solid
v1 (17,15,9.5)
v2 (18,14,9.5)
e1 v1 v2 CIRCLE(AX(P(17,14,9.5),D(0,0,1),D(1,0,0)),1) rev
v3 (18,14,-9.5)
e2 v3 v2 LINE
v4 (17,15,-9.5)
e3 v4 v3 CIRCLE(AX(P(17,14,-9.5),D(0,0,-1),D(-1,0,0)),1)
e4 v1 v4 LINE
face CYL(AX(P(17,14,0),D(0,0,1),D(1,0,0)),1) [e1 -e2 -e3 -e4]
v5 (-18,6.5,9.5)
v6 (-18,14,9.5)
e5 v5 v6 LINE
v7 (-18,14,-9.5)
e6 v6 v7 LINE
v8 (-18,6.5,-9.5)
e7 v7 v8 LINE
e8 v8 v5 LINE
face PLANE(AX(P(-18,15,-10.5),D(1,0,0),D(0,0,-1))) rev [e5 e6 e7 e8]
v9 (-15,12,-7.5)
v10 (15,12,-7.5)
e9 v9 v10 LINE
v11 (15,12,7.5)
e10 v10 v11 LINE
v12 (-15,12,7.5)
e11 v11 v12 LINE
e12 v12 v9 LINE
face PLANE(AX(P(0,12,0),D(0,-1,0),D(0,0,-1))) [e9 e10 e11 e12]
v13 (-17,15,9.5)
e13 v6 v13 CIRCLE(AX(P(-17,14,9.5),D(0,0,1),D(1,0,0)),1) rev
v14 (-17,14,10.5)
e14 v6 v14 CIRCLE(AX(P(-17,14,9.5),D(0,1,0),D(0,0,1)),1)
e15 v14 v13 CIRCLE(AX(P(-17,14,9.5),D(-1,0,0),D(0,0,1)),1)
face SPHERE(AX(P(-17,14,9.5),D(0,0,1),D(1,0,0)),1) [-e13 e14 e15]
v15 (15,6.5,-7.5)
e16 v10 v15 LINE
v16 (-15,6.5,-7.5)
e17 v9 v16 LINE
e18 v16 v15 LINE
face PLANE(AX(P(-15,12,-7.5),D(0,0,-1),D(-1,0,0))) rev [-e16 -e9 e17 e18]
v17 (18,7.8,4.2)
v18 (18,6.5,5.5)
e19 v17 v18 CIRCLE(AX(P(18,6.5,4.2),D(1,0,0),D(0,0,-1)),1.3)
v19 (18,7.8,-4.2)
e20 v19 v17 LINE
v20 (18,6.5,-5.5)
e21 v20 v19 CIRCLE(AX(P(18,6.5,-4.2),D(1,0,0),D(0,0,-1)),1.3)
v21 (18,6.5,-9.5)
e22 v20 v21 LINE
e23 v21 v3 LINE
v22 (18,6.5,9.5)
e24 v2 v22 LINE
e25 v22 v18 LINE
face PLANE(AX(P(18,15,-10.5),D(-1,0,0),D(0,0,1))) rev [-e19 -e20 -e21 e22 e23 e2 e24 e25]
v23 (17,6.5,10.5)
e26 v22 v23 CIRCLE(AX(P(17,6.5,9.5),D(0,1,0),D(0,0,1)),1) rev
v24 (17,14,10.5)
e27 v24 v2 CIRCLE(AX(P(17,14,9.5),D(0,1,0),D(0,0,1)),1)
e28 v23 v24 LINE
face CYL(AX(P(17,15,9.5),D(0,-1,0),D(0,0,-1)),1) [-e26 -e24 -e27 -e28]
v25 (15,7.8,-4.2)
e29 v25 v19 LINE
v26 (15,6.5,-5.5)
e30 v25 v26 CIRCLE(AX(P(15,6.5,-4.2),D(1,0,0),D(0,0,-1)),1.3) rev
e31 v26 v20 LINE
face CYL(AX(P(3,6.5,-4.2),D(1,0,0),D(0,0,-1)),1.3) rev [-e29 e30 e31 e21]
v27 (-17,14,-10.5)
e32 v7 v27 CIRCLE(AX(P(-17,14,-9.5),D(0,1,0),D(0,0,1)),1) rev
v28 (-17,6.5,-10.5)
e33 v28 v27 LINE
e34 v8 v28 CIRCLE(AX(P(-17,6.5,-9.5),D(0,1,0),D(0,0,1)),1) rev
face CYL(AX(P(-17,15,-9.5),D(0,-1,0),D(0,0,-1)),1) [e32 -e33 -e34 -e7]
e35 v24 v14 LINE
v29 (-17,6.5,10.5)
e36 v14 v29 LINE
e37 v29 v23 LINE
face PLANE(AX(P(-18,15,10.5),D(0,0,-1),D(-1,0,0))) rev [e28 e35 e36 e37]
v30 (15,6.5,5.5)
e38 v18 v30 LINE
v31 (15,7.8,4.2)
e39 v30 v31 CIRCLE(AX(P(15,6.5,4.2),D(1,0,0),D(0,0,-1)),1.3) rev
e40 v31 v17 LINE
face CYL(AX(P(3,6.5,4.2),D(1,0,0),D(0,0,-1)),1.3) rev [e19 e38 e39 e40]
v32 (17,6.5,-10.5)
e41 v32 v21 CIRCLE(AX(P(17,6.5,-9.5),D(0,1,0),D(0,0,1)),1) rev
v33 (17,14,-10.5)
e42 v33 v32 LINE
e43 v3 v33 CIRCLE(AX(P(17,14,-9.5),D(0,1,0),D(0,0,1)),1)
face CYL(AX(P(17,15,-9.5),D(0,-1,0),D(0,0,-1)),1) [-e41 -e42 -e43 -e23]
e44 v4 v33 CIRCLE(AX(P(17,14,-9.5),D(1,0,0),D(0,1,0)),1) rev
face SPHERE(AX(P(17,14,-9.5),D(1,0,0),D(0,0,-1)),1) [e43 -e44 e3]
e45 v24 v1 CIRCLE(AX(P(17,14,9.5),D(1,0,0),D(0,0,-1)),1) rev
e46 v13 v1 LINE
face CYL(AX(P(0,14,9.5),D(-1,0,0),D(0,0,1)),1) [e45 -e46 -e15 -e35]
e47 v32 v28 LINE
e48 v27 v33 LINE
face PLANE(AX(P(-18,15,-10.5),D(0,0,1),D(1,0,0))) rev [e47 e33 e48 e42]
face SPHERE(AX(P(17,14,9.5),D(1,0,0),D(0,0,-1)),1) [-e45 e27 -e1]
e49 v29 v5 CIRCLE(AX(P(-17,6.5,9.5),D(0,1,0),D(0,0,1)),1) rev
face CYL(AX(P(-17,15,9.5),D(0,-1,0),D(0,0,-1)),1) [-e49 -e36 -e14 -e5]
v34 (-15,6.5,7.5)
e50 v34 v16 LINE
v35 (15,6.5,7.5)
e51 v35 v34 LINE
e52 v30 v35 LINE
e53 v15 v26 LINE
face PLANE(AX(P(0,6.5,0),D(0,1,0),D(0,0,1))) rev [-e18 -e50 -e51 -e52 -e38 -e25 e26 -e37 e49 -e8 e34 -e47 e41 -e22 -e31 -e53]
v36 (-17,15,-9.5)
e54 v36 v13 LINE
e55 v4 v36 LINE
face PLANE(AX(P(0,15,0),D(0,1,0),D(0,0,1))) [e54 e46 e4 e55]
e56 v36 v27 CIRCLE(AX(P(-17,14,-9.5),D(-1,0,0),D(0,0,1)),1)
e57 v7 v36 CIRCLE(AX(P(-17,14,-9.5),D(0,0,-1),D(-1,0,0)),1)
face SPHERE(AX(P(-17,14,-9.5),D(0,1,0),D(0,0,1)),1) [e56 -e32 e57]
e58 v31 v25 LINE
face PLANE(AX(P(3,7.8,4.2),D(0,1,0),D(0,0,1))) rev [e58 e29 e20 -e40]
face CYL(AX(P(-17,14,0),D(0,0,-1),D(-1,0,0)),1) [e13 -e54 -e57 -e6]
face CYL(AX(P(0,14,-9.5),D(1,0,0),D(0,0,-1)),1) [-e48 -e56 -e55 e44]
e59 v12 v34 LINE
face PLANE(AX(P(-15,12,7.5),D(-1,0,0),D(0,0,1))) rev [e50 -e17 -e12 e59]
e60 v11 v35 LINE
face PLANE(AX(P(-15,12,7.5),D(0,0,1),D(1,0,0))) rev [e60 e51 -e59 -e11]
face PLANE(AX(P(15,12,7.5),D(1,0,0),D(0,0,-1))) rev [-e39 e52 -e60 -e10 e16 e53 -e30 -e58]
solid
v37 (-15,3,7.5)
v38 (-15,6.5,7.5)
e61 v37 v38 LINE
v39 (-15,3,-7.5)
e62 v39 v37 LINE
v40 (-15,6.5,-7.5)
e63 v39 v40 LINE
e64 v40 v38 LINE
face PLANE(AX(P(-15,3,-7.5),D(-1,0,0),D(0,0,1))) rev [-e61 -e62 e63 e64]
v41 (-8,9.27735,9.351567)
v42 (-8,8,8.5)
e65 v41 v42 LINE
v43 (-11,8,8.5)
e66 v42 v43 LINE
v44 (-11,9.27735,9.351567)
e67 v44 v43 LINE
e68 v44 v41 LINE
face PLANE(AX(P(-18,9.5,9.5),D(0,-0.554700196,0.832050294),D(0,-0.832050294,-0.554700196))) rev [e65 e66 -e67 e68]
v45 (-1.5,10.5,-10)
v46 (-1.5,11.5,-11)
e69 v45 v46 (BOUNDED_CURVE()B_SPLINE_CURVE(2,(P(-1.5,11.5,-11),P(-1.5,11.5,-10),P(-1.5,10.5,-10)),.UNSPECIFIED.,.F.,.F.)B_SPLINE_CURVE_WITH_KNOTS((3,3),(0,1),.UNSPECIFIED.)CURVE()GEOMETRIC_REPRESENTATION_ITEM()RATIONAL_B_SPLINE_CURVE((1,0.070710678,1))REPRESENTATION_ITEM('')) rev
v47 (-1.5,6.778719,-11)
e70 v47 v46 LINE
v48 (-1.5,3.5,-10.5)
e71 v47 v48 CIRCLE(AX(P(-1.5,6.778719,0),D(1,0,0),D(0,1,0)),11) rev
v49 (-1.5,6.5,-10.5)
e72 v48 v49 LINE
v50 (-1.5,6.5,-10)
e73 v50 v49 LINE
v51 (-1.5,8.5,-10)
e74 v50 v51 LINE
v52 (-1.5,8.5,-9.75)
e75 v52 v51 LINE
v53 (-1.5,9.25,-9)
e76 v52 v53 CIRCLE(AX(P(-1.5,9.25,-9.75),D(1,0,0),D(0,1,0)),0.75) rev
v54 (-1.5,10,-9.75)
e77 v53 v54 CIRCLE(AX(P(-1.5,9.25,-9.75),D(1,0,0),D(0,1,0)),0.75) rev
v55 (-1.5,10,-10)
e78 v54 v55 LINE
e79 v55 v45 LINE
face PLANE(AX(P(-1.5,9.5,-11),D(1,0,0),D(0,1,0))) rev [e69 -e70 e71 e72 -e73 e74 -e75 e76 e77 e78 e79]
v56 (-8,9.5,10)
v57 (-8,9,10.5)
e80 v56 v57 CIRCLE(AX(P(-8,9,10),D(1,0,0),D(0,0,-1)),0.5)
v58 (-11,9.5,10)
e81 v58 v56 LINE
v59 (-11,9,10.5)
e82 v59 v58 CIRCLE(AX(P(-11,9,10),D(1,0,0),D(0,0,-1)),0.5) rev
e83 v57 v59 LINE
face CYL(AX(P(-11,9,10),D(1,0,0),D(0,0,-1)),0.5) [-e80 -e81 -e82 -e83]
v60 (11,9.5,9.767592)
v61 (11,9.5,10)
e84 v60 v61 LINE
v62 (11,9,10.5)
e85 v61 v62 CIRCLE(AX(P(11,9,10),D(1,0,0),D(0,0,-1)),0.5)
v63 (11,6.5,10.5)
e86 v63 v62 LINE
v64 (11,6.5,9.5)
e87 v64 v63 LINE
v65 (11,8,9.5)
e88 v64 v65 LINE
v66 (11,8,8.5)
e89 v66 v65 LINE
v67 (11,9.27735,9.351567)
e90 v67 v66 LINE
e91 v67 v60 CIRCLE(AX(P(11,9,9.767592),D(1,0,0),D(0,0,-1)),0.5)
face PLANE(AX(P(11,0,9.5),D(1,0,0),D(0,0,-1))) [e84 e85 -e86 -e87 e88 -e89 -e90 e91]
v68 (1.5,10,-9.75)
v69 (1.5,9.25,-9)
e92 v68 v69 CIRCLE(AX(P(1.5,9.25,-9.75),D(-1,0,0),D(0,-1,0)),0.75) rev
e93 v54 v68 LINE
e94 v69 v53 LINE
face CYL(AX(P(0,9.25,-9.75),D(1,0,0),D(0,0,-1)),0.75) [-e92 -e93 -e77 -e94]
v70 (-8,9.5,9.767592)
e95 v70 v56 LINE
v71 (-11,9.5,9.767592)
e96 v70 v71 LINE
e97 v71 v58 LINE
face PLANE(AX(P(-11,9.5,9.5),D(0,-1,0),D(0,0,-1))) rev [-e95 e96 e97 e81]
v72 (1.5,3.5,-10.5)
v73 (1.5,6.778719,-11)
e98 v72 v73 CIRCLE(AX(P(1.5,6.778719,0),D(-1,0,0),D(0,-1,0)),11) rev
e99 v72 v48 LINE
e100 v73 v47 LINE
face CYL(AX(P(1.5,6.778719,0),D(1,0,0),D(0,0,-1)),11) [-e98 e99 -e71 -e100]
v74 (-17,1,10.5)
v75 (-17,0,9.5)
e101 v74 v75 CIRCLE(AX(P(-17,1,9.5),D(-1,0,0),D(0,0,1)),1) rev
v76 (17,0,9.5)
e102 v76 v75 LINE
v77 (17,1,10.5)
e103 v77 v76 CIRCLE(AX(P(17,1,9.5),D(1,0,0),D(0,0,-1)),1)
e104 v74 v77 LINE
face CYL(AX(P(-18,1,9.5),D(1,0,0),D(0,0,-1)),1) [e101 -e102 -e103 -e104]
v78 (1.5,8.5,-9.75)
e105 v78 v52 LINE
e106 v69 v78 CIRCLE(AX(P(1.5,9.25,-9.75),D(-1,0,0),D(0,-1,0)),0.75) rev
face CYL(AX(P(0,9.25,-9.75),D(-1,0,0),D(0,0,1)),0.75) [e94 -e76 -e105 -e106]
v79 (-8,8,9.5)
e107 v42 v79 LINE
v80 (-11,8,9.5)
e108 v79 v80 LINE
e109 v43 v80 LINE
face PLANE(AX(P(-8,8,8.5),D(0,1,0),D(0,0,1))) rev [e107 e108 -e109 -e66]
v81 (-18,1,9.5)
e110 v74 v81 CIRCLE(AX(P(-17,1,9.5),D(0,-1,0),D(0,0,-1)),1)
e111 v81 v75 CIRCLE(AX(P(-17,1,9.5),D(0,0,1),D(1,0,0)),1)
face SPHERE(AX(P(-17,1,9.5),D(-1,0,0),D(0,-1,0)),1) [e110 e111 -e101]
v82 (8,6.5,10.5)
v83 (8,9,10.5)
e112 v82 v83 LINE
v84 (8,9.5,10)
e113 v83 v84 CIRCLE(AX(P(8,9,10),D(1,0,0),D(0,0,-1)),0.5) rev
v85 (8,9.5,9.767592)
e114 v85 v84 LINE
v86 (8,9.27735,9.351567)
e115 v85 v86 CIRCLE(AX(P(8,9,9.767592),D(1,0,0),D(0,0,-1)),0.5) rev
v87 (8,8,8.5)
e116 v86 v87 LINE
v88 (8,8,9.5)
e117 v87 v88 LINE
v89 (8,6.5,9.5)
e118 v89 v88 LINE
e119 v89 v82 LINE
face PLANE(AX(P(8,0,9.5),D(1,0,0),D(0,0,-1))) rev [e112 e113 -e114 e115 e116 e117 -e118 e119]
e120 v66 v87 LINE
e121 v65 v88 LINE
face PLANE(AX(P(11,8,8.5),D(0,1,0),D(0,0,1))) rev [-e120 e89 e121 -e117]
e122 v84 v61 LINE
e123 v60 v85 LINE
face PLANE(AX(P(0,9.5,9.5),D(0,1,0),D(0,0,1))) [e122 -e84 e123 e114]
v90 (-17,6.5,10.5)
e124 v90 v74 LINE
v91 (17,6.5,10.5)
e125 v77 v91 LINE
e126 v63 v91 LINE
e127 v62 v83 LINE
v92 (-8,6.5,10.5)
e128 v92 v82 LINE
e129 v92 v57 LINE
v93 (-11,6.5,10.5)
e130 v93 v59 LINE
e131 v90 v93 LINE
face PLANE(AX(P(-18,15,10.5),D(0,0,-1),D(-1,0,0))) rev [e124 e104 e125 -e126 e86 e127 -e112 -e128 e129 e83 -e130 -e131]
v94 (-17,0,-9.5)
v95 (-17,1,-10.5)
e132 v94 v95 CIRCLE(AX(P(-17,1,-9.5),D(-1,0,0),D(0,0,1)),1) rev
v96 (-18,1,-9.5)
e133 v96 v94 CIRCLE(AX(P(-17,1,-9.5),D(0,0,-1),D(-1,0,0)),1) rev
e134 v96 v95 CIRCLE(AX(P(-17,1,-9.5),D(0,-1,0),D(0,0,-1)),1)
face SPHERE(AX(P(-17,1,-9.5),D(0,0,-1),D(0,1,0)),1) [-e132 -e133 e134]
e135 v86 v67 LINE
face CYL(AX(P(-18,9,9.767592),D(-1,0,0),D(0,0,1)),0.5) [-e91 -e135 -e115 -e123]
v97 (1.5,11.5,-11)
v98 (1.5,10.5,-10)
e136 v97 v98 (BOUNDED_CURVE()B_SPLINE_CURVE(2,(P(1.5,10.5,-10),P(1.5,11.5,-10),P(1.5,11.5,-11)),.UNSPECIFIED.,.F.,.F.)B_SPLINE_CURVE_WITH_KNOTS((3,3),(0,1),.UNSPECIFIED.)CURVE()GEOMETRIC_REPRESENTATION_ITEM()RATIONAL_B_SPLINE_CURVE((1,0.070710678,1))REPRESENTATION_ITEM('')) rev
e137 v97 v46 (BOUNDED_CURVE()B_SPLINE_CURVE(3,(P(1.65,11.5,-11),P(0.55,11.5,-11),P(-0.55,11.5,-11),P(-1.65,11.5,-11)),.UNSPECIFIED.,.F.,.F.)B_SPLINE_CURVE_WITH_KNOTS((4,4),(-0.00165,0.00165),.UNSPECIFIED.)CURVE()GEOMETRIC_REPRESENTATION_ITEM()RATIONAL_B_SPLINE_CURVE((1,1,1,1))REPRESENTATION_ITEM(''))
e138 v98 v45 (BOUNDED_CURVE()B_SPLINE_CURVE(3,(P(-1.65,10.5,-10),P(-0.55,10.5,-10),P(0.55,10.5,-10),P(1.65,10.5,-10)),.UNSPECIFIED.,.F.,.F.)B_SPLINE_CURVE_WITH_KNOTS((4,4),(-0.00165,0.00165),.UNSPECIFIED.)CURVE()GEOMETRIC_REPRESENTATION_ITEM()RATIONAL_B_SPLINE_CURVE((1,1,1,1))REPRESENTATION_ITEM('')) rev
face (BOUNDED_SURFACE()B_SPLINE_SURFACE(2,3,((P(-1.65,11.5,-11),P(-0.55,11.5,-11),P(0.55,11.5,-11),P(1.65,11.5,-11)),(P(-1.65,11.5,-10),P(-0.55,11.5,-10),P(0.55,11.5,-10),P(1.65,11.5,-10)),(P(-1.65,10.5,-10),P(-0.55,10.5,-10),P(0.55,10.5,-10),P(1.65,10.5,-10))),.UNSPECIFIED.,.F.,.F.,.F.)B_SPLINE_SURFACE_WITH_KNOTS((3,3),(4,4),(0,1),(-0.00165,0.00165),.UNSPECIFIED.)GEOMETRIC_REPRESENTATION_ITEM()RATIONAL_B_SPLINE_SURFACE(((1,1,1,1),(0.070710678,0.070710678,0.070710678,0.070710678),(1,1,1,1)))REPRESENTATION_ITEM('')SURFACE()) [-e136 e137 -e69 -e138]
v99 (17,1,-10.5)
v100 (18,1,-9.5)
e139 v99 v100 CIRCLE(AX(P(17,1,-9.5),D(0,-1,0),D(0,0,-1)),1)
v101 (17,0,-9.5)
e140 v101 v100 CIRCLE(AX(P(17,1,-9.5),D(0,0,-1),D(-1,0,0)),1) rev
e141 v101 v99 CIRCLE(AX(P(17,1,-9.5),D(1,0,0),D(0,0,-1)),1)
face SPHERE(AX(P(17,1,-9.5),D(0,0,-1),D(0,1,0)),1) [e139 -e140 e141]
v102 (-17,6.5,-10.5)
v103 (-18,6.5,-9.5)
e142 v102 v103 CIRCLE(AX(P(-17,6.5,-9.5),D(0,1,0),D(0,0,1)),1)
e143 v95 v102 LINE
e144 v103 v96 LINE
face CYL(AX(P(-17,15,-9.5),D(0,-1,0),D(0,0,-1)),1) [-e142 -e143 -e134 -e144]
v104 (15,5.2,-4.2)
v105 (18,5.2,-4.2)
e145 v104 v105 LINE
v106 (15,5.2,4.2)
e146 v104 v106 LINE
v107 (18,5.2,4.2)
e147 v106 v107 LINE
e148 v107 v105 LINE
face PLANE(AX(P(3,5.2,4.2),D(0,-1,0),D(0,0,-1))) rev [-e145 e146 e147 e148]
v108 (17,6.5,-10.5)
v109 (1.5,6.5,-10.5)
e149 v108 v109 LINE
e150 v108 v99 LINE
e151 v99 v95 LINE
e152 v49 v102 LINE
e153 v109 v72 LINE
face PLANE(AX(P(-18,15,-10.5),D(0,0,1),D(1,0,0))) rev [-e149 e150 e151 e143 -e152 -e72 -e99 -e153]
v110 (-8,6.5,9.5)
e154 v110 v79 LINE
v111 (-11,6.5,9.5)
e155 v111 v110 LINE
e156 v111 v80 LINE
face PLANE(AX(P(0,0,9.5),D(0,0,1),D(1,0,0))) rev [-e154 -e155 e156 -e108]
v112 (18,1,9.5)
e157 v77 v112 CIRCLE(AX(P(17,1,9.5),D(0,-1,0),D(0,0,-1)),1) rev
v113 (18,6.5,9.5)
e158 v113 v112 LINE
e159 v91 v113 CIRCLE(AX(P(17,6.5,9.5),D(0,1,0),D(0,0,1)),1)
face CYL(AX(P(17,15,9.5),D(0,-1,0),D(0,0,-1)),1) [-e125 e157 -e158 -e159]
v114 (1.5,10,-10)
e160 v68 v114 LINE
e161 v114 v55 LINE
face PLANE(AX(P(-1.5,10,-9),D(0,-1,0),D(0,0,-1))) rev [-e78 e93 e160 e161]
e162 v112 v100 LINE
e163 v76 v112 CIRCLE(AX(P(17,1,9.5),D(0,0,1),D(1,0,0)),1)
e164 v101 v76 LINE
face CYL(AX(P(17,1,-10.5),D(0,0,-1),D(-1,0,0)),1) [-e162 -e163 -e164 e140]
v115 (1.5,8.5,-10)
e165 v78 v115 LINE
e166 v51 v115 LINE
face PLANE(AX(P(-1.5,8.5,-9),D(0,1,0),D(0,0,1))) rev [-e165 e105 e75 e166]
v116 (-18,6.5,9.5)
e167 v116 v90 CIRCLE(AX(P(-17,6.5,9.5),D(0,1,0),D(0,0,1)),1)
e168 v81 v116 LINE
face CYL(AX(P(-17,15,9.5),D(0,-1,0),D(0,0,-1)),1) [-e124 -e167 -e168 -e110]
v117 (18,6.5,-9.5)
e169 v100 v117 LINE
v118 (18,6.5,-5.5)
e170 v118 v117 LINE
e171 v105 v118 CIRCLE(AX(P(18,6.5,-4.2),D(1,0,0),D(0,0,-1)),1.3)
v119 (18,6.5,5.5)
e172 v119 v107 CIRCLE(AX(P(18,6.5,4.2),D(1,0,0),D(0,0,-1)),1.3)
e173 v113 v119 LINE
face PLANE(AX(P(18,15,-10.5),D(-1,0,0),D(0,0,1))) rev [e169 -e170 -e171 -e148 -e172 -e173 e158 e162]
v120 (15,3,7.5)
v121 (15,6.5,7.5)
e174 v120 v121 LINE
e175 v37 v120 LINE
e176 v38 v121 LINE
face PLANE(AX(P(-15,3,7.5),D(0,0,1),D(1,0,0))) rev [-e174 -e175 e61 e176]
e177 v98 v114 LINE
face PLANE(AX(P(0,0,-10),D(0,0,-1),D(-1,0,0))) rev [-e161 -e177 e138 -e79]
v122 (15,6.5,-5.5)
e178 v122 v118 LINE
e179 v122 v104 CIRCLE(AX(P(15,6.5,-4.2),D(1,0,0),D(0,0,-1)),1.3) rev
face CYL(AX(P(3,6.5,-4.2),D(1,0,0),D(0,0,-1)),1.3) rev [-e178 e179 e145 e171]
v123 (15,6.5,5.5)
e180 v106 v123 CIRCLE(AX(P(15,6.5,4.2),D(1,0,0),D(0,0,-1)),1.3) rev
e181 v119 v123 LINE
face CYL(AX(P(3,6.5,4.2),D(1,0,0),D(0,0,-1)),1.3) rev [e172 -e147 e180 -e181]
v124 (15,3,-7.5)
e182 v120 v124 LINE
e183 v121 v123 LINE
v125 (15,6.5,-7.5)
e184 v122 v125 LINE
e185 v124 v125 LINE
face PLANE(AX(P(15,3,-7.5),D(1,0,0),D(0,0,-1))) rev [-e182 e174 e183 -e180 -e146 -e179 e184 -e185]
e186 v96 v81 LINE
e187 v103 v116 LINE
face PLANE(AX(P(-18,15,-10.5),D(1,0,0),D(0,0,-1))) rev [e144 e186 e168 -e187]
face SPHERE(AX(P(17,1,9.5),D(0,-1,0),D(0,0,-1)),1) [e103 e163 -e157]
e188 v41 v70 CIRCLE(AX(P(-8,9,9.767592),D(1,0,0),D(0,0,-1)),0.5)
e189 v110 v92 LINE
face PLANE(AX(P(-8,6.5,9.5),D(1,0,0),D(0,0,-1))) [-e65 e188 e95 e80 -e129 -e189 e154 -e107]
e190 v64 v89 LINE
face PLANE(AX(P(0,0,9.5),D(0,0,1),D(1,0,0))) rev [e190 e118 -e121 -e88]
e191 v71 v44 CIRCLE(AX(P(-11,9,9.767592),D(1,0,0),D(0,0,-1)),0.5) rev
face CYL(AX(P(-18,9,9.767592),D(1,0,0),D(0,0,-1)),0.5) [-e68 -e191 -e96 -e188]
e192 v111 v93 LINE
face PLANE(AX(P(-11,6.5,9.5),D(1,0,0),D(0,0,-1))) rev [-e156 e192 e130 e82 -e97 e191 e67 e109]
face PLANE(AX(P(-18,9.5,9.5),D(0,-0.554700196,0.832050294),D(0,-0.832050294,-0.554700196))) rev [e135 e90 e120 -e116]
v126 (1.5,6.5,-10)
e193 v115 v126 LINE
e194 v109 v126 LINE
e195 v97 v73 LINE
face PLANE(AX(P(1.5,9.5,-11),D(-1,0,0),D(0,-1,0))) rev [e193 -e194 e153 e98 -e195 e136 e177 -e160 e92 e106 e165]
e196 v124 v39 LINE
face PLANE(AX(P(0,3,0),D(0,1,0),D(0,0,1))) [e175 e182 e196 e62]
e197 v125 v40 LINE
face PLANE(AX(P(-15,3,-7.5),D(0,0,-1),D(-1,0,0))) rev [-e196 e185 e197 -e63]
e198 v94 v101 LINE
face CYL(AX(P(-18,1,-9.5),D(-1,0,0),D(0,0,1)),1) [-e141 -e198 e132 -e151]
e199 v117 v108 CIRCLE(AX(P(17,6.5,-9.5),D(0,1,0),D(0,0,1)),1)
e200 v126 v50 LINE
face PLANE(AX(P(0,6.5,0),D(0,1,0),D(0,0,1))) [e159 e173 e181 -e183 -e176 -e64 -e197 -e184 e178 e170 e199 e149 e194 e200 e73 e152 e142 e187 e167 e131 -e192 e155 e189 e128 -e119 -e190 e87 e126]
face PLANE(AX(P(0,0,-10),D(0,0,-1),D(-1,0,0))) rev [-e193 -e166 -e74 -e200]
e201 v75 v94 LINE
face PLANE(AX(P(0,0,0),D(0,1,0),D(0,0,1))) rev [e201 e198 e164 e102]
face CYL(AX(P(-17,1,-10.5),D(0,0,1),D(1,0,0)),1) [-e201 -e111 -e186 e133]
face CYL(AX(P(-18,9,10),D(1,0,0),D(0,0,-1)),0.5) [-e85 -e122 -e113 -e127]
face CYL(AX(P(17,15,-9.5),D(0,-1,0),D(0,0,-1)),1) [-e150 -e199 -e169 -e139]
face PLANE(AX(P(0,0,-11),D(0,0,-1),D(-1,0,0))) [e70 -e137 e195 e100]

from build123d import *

# Parameters (mm, degrees)
SKETCH1_W           = 36
SKETCH1_H           = 21
BOSS_EXTRUDE2_DEPTH = 15
CUT_EXTRUDE1_DEPTH  = 15
SKETCH5_W           = 30
SKETCH5_H           = 15
CUT_EXTRUDE2_DEPTH  = 3.5
SKETCH7_W           = 30
SKETCH7_H           = 15
CUT_EXTRUDE3_DEPTH  = 5.5
FILLET1_R           = 1
FILLET2_R           = 1
SKETCH9_W           = 3
SKETCH9_H           = 3
BOSS_EXTRUDE3_DEPTH = 1
SKETCH9_4_W         = 3
SKETCH9_4_H         = 3
BOSS_EXTRUDE4_DEPTH = 1
SKETCH10_W          = 3
SKETCH10_H          = 1.5
BOSS_EXTRUDE5_DEPTH = 1
CUT_EXTRUDE4_DEPTH  = 35.296501279
SKETCH12_W          = 3
SKETCH12_H          = 6
BOSS_EXTRUDE6_DEPTH = 0.5
FILLET3_R           = 11
FILLET4_R           = 0.5
SKETCH17_W          = 3
SKETCH17_H          = 2
BOSS_EXTRUDE7_DEPTH = 1
SKETCH18_W          = 3
SKETCH18_H          = 1.5
BOSS_EXTRUDE8_DEPTH = 1
FILLET5_R           = 0.75
FILLET6_SIZE        = 1


# Some blends are built 0.0001 mm under size
with BuildPart() as part:
    # Sketch1 → Boss-Extrude2 (new body)
    with BuildSketch(Plane(origin=(0, 0, 0), x_dir=(1, 0, 0), z_dir=(0, 1, 0))):
        Rectangle(SKETCH1_W, SKETCH1_H)
    extrude(amount=BOSS_EXTRUDE2_DEPTH)

    # Sketch2 → Cut-Extrude1 (cut)
    with BuildSketch(Plane(origin=(18, 0, 0), x_dir=(0, 0, -1), z_dir=(1, 0, 0))):
        with BuildLine():
            Line((-4.2, 7.8), (4.2, 7.8))
            ThreePointArc((4.2, 7.8), (5.5, 6.5), (4.2, 5.2))
            Line((4.2, 5.2), (-4.2, 5.2))
            ThreePointArc((-4.2, 5.2), (-5.5, 6.5), (-4.2, 7.8))
        make_face()
    extrude(amount=-CUT_EXTRUDE1_DEPTH, mode=Mode.SUBTRACT)


with BuildPart() as body_2:
    # Split1: the piece on the far side of the plane
    add(part.part)
    split(bisect_by=Plane.ZX.offset(6.5), keep=Keep.BOTTOM)

    # Sketch5 → Cut-Extrude2 (cut)
    with BuildSketch(Plane(origin=(0, 6.5, 0), x_dir=(1, 0, 0), z_dir=(0, 1, 0))):
        Rectangle(SKETCH5_W, SKETCH5_H)
    extrude(amount=-CUT_EXTRUDE2_DEPTH, mode=Mode.SUBTRACT)

    # Fillet2
    fillet2_edges = [body_2.edges().sort_by_distance(p)[0] for p in [
        (18, 0, 0),
        (0, 0, -10.5),
        (-18, 0, 0),
        (0, 0, 10.5),
        (18, 3.25, 10.5),
        (-18, 3.25, 10.5),
        (-18, 3.25, -10.5),
        (18, 3.25, -10.5),
    ]]
    fillet(fillet2_edges, radius=FILLET2_R)

    # Sketch9 → Boss-Extrude3 (add)
    with BuildSketch(Plane.XY.offset(10.5)):
        with Locations((-9.5, 8)):
            Rectangle(SKETCH9_W, SKETCH9_H)
    extrude(amount=-BOSS_EXTRUDE3_DEPTH)

    # Sketch9<4> → Boss-Extrude4 (add)
    with BuildSketch(Plane.XY.offset(10.5)):
        with Locations((9.5, 8)):
            Rectangle(SKETCH9_4_W, SKETCH9_4_H)
    extrude(amount=-BOSS_EXTRUDE4_DEPTH)

    # Sketch10 → Boss-Extrude5 (add)
    with BuildSketch(Plane(origin=(0, 0, 9.5), x_dir=(-1, 0, 0), z_dir=(0, 0, -1))):
        with Locations((-9.5, 8.75)):
            Rectangle(SKETCH10_W, SKETCH10_H)
        with Locations((9.5, 8.75)):
            Rectangle(SKETCH10_W, SKETCH10_H)
    extrude(amount=BOSS_EXTRUDE5_DEPTH)

    # Sketch11 → Cut-Extrude4 (cut, through all)
    with BuildSketch(Plane(origin=(11, 0, 0), x_dir=(0, 0, -1), z_dir=(1, 0, 0))):
        Polygon((-9.5, 9.5), (-8.5, 8), (-8.5, 9.5), align=None)
    extrude(amount=-CUT_EXTRUDE4_DEPTH, mode=Mode.SUBTRACT)

    # Sketch12 → Boss-Extrude6 (add, symmetric)
    with BuildSketch(Plane(origin=(0, 0, -10.5), x_dir=(-1, 0, 0), z_dir=(0, 0, -1))):
        with Locations((0, 6.5)):
            Rectangle(SKETCH12_W, SKETCH12_H)
    extrude(amount=BOSS_EXTRUDE6_DEPTH, both=True)

    # Fillet3
    # the kernel refuses this fillet: 11 mm, written as the material it takes off along each edge
    with BuildSketch(Plane(origin=(-9.696798155, 3.5, -11), x_dir=(0, 0, 1), z_dir=(1, 0, 0))) as fillet3_piece_1:
        with BuildLine():
            CenterArc((11, -3.278719262), FILLET3_R, 162.658557197, 17.341442803)
            Line((0, -3.278719262), (-0.22, -3.278719262))
            Line((-0.22, -3.278719262), (-0.22, 0))
            Line((-0.22, 0), (0, 0.22))
            ThreePointArc((0, 0.22), (0.25, 0.22), (0.29, 0.065574385))
            Line((0.29, 0.065574385), (0.5, 0))
        make_face()
    extrude(amount=19.393596311, mode=Mode.SUBTRACT)

    # Fillet4
    fillet4_edges = [body_2.edges().sort_by_distance(p)[0] for p in [
        (-9.5, 9.5, 9.5),
        (9.5, 9.5, 9.5),
        (-9.5, 9.5, 10.5),
        (9.5, 9.5, 10.5),
    ]]
    fillet(fillet4_edges, radius=FILLET4_R)

    # Sketch17 → Boss-Extrude7 (add)
    with BuildSketch(Plane.XY.offset(-10)):
        with Locations((0, 10.5)):
            Rectangle(SKETCH17_W, SKETCH17_H)
    extrude(amount=-BOSS_EXTRUDE7_DEPTH)

    # Sketch18 → Boss-Extrude8 (add)
    with BuildSketch(Plane.XY.offset(-10)):
        with Locations((0, 9.25)):
            Rectangle(SKETCH18_W, SKETCH18_H)
    extrude(amount=BOSS_EXTRUDE8_DEPTH)

    # Fillet5
    fillet5_edges = [body_2.edges().sort_by_distance(p)[0] for p in [
        (0, 8.5, -9),
        (0, 10, -9),
    ]]
    fillet(fillet5_edges, radius=FILLET5_R - 0.0001)  # a hair under: the kernel refuses the full size

    # Fillet6
    # a fillet whose section is not a circle: 1 mm, written as the material it takes off along each edge
    with BuildSketch(Plane(origin=(4, 11.5, -10), x_dir=(0, -1, 0), z_dir=(-1, 0, 0))) as fillet6_piece_1:
        with BuildLine():
            Bezier((FILLET6_SIZE, 0), (0, 0), (0, -FILLET6_SIZE), weights=[1, 0.070710678, 1])
            Line((0, -FILLET6_SIZE), (0, 0))
            Line((0, 0), (FILLET6_SIZE, 0))
        make_face()
    extrude(amount=8, mode=Mode.SUBTRACT)


with BuildPart() as part_1:
    add(part.part)

    # Split1
    split(bisect_by=Plane.ZX.offset(6.5), keep=Keep.TOP)

    # Sketch7 → Cut-Extrude3 (cut)
    with BuildSketch(Plane.XZ.offset(-6.5)):
        Rectangle(SKETCH7_W, SKETCH7_H)
    extrude(amount=-CUT_EXTRUDE3_DEPTH, mode=Mode.SUBTRACT)

    # Fillet1
    fillet1_edges = [part_1.edges().sort_by_distance(p)[0] for p in [
        (-18, 15, 0),
        (0, 15, 10.5),
        (18, 15, 0),
        (18, 10.75, 10.5),
        (-18, 10.75, 10.5),
        (-18, 10.75, -10.5),
        (18, 10.75, -10.5),
        (0, 15, -10.5),
    ]]
    fillet(fillet1_edges, radius=FILLET1_R)


solid = Compound([body_2.part, part_1.part])
